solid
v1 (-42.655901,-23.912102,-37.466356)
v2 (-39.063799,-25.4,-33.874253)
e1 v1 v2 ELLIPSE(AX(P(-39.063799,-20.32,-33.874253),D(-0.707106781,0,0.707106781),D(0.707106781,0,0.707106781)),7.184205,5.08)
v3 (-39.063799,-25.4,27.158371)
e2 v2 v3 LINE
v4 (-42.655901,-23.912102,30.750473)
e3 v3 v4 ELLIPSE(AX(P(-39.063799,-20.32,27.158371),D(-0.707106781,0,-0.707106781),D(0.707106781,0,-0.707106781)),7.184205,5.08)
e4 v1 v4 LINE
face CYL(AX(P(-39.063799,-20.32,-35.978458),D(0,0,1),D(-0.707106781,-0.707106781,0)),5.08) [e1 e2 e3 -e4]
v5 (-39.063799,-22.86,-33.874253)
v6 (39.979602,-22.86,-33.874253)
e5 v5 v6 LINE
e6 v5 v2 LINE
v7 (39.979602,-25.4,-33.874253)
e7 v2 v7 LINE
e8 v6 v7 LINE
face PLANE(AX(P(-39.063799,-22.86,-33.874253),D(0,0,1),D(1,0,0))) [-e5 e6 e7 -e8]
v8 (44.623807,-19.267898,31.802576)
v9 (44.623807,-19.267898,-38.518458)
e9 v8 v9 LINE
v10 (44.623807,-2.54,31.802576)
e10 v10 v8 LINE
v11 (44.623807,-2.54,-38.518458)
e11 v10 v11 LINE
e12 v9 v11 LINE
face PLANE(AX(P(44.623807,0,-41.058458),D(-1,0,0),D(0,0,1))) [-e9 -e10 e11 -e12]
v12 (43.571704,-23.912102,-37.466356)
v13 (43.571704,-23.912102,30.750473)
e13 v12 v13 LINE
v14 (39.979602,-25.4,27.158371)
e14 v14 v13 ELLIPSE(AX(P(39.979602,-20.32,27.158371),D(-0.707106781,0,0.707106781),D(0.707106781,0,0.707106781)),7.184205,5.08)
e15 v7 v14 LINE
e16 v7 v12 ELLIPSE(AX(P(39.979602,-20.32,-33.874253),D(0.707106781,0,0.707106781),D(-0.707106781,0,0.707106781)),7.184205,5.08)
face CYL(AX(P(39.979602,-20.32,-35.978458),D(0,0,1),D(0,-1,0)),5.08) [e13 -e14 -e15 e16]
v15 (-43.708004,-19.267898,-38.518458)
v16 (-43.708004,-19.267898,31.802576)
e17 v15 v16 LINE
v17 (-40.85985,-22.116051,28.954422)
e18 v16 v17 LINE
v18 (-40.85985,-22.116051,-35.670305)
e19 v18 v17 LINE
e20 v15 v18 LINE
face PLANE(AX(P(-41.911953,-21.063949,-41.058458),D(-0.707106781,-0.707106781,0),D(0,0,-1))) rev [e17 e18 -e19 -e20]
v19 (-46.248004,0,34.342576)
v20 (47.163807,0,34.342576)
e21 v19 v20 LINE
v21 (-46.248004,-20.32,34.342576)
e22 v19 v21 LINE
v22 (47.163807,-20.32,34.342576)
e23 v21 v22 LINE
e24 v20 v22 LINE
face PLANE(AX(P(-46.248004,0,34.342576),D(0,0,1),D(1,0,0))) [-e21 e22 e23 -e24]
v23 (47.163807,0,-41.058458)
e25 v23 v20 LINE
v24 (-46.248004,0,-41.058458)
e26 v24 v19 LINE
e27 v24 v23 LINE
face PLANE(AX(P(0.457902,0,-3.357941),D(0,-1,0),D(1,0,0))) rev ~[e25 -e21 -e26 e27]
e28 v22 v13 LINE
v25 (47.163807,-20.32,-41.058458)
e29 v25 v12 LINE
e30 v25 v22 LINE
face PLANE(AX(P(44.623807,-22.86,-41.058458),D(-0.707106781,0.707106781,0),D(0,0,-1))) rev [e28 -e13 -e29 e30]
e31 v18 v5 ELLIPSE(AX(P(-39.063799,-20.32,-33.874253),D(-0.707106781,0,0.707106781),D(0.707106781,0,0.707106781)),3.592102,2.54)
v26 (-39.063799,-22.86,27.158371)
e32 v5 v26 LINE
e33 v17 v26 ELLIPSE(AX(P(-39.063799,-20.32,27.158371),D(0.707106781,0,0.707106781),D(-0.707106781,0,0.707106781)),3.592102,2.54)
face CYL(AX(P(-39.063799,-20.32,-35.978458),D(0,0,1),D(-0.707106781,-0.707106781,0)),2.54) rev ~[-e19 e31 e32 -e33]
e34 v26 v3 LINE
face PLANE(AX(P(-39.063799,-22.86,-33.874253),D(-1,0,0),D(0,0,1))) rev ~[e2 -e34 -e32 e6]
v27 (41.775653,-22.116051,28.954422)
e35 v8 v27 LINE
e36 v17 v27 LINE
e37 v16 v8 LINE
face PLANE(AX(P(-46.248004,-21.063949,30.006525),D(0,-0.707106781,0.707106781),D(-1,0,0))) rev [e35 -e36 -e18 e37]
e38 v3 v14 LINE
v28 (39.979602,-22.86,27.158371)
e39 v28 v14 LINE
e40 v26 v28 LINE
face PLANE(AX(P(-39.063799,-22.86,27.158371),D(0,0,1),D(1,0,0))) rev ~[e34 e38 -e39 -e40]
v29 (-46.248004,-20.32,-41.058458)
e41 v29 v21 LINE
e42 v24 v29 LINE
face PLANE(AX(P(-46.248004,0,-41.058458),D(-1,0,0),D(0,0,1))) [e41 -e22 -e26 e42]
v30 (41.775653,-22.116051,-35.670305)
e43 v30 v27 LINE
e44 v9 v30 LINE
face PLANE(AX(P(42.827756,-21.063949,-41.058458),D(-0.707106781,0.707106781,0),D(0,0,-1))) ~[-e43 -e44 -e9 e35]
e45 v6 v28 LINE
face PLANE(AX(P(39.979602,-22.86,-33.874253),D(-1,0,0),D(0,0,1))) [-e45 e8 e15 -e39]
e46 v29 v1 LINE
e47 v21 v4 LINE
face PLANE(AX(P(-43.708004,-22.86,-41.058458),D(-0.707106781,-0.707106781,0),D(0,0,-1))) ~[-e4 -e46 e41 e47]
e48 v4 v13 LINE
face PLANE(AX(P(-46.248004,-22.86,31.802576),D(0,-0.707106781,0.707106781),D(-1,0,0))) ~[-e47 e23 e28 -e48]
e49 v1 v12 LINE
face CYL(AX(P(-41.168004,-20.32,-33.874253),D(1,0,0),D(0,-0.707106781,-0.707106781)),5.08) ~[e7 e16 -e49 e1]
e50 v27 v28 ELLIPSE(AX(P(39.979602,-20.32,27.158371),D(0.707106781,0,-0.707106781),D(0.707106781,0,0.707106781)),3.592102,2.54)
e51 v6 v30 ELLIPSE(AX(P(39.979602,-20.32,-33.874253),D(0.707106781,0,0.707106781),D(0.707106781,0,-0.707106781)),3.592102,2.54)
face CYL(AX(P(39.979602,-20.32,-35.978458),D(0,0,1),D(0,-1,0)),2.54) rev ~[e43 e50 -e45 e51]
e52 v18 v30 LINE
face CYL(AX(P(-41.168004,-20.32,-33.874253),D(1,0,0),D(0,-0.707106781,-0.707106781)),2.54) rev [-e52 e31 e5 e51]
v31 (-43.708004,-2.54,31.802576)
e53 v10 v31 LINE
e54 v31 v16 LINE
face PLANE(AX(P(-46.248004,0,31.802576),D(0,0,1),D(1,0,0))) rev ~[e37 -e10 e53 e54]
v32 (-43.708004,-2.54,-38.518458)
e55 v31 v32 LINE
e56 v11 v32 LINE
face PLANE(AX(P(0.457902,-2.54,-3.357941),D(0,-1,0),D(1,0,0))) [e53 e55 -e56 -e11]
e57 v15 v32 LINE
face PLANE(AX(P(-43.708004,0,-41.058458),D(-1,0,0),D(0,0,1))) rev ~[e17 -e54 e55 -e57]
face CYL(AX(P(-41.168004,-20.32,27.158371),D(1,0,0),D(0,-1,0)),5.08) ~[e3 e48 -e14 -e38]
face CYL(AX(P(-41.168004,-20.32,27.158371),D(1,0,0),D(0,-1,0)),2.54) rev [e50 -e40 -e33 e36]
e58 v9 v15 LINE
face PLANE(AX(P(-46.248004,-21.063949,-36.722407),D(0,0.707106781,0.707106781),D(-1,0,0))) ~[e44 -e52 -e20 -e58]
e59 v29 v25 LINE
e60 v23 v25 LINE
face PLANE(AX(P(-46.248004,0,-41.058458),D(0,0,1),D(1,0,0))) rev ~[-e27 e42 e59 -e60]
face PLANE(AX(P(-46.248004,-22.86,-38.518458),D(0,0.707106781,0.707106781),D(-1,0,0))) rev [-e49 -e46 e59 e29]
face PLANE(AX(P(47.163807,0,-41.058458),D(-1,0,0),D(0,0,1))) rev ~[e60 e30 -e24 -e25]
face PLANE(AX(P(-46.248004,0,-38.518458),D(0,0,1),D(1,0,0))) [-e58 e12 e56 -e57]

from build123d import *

# Parameters (mm, degrees)
F0_W     = 93.4118106961
F0_H     = 75.4010342062
F1_DEPTH = 25.4
F2_SIZE  = 5.08
F3_R     = 5.08
F4_T     = -2.54


# Not quite as in the source:
# - a shell that OpenCascade refuses in one call is made with other operations: the cavity is built on its own and cut out


with BuildPart() as f1:
    # F0 (on Front) → F1 (new body)
    with BuildSketch(Plane.XZ):
        with Locations((0.4579015076, -3.3579412848)):
            Rectangle(F0_W, F0_H)
    extrude(amount=F1_DEPTH)

    # F2
    f2_edges = [f1.edges().sort_by_distance(p)[0] for p in [
        (0.457902, -25.4, 34.342576),
        (-46.248004, -25.4, -3.357941),
        (0.457902, -25.4, -41.058458),
        (47.163807, -25.4, -3.357941),
    ]]
    chamfer(f2_edges, length=F2_SIZE)

    # F3
    f3_edges = [f1.edges().sort_by_distance(p)[0] for p in [
        (0.457902, -25.4, 29.262576),
        (42.083807, -25.4, -3.357941),
        (-41.168004, -25.4, -3.357941),
        (0.457902, -25.4, -35.978458),
    ]]
    fillet(f3_edges, radius=F3_R)

    # F4: a shell. OpenCascade refuses it in one call, so the cavity is built on its own and cut out:
    # the body offset inwards by the wall thickness, plus a prism from it out through each open face.
    f4_core = offset(f1.part, amount=F4_T, mode=Mode.PRIVATE)
    f4_exits = [f4_core.faces().sort_by_distance(p)[0] for p in [
        (0.457902, -22.86, -3.357941),
    ]]
    add(f4_core, mode=Mode.SUBTRACT)
    extrude(f4_exits, amount=-F4_T, mode=Mode.SUBTRACT)


solid = f1.part
